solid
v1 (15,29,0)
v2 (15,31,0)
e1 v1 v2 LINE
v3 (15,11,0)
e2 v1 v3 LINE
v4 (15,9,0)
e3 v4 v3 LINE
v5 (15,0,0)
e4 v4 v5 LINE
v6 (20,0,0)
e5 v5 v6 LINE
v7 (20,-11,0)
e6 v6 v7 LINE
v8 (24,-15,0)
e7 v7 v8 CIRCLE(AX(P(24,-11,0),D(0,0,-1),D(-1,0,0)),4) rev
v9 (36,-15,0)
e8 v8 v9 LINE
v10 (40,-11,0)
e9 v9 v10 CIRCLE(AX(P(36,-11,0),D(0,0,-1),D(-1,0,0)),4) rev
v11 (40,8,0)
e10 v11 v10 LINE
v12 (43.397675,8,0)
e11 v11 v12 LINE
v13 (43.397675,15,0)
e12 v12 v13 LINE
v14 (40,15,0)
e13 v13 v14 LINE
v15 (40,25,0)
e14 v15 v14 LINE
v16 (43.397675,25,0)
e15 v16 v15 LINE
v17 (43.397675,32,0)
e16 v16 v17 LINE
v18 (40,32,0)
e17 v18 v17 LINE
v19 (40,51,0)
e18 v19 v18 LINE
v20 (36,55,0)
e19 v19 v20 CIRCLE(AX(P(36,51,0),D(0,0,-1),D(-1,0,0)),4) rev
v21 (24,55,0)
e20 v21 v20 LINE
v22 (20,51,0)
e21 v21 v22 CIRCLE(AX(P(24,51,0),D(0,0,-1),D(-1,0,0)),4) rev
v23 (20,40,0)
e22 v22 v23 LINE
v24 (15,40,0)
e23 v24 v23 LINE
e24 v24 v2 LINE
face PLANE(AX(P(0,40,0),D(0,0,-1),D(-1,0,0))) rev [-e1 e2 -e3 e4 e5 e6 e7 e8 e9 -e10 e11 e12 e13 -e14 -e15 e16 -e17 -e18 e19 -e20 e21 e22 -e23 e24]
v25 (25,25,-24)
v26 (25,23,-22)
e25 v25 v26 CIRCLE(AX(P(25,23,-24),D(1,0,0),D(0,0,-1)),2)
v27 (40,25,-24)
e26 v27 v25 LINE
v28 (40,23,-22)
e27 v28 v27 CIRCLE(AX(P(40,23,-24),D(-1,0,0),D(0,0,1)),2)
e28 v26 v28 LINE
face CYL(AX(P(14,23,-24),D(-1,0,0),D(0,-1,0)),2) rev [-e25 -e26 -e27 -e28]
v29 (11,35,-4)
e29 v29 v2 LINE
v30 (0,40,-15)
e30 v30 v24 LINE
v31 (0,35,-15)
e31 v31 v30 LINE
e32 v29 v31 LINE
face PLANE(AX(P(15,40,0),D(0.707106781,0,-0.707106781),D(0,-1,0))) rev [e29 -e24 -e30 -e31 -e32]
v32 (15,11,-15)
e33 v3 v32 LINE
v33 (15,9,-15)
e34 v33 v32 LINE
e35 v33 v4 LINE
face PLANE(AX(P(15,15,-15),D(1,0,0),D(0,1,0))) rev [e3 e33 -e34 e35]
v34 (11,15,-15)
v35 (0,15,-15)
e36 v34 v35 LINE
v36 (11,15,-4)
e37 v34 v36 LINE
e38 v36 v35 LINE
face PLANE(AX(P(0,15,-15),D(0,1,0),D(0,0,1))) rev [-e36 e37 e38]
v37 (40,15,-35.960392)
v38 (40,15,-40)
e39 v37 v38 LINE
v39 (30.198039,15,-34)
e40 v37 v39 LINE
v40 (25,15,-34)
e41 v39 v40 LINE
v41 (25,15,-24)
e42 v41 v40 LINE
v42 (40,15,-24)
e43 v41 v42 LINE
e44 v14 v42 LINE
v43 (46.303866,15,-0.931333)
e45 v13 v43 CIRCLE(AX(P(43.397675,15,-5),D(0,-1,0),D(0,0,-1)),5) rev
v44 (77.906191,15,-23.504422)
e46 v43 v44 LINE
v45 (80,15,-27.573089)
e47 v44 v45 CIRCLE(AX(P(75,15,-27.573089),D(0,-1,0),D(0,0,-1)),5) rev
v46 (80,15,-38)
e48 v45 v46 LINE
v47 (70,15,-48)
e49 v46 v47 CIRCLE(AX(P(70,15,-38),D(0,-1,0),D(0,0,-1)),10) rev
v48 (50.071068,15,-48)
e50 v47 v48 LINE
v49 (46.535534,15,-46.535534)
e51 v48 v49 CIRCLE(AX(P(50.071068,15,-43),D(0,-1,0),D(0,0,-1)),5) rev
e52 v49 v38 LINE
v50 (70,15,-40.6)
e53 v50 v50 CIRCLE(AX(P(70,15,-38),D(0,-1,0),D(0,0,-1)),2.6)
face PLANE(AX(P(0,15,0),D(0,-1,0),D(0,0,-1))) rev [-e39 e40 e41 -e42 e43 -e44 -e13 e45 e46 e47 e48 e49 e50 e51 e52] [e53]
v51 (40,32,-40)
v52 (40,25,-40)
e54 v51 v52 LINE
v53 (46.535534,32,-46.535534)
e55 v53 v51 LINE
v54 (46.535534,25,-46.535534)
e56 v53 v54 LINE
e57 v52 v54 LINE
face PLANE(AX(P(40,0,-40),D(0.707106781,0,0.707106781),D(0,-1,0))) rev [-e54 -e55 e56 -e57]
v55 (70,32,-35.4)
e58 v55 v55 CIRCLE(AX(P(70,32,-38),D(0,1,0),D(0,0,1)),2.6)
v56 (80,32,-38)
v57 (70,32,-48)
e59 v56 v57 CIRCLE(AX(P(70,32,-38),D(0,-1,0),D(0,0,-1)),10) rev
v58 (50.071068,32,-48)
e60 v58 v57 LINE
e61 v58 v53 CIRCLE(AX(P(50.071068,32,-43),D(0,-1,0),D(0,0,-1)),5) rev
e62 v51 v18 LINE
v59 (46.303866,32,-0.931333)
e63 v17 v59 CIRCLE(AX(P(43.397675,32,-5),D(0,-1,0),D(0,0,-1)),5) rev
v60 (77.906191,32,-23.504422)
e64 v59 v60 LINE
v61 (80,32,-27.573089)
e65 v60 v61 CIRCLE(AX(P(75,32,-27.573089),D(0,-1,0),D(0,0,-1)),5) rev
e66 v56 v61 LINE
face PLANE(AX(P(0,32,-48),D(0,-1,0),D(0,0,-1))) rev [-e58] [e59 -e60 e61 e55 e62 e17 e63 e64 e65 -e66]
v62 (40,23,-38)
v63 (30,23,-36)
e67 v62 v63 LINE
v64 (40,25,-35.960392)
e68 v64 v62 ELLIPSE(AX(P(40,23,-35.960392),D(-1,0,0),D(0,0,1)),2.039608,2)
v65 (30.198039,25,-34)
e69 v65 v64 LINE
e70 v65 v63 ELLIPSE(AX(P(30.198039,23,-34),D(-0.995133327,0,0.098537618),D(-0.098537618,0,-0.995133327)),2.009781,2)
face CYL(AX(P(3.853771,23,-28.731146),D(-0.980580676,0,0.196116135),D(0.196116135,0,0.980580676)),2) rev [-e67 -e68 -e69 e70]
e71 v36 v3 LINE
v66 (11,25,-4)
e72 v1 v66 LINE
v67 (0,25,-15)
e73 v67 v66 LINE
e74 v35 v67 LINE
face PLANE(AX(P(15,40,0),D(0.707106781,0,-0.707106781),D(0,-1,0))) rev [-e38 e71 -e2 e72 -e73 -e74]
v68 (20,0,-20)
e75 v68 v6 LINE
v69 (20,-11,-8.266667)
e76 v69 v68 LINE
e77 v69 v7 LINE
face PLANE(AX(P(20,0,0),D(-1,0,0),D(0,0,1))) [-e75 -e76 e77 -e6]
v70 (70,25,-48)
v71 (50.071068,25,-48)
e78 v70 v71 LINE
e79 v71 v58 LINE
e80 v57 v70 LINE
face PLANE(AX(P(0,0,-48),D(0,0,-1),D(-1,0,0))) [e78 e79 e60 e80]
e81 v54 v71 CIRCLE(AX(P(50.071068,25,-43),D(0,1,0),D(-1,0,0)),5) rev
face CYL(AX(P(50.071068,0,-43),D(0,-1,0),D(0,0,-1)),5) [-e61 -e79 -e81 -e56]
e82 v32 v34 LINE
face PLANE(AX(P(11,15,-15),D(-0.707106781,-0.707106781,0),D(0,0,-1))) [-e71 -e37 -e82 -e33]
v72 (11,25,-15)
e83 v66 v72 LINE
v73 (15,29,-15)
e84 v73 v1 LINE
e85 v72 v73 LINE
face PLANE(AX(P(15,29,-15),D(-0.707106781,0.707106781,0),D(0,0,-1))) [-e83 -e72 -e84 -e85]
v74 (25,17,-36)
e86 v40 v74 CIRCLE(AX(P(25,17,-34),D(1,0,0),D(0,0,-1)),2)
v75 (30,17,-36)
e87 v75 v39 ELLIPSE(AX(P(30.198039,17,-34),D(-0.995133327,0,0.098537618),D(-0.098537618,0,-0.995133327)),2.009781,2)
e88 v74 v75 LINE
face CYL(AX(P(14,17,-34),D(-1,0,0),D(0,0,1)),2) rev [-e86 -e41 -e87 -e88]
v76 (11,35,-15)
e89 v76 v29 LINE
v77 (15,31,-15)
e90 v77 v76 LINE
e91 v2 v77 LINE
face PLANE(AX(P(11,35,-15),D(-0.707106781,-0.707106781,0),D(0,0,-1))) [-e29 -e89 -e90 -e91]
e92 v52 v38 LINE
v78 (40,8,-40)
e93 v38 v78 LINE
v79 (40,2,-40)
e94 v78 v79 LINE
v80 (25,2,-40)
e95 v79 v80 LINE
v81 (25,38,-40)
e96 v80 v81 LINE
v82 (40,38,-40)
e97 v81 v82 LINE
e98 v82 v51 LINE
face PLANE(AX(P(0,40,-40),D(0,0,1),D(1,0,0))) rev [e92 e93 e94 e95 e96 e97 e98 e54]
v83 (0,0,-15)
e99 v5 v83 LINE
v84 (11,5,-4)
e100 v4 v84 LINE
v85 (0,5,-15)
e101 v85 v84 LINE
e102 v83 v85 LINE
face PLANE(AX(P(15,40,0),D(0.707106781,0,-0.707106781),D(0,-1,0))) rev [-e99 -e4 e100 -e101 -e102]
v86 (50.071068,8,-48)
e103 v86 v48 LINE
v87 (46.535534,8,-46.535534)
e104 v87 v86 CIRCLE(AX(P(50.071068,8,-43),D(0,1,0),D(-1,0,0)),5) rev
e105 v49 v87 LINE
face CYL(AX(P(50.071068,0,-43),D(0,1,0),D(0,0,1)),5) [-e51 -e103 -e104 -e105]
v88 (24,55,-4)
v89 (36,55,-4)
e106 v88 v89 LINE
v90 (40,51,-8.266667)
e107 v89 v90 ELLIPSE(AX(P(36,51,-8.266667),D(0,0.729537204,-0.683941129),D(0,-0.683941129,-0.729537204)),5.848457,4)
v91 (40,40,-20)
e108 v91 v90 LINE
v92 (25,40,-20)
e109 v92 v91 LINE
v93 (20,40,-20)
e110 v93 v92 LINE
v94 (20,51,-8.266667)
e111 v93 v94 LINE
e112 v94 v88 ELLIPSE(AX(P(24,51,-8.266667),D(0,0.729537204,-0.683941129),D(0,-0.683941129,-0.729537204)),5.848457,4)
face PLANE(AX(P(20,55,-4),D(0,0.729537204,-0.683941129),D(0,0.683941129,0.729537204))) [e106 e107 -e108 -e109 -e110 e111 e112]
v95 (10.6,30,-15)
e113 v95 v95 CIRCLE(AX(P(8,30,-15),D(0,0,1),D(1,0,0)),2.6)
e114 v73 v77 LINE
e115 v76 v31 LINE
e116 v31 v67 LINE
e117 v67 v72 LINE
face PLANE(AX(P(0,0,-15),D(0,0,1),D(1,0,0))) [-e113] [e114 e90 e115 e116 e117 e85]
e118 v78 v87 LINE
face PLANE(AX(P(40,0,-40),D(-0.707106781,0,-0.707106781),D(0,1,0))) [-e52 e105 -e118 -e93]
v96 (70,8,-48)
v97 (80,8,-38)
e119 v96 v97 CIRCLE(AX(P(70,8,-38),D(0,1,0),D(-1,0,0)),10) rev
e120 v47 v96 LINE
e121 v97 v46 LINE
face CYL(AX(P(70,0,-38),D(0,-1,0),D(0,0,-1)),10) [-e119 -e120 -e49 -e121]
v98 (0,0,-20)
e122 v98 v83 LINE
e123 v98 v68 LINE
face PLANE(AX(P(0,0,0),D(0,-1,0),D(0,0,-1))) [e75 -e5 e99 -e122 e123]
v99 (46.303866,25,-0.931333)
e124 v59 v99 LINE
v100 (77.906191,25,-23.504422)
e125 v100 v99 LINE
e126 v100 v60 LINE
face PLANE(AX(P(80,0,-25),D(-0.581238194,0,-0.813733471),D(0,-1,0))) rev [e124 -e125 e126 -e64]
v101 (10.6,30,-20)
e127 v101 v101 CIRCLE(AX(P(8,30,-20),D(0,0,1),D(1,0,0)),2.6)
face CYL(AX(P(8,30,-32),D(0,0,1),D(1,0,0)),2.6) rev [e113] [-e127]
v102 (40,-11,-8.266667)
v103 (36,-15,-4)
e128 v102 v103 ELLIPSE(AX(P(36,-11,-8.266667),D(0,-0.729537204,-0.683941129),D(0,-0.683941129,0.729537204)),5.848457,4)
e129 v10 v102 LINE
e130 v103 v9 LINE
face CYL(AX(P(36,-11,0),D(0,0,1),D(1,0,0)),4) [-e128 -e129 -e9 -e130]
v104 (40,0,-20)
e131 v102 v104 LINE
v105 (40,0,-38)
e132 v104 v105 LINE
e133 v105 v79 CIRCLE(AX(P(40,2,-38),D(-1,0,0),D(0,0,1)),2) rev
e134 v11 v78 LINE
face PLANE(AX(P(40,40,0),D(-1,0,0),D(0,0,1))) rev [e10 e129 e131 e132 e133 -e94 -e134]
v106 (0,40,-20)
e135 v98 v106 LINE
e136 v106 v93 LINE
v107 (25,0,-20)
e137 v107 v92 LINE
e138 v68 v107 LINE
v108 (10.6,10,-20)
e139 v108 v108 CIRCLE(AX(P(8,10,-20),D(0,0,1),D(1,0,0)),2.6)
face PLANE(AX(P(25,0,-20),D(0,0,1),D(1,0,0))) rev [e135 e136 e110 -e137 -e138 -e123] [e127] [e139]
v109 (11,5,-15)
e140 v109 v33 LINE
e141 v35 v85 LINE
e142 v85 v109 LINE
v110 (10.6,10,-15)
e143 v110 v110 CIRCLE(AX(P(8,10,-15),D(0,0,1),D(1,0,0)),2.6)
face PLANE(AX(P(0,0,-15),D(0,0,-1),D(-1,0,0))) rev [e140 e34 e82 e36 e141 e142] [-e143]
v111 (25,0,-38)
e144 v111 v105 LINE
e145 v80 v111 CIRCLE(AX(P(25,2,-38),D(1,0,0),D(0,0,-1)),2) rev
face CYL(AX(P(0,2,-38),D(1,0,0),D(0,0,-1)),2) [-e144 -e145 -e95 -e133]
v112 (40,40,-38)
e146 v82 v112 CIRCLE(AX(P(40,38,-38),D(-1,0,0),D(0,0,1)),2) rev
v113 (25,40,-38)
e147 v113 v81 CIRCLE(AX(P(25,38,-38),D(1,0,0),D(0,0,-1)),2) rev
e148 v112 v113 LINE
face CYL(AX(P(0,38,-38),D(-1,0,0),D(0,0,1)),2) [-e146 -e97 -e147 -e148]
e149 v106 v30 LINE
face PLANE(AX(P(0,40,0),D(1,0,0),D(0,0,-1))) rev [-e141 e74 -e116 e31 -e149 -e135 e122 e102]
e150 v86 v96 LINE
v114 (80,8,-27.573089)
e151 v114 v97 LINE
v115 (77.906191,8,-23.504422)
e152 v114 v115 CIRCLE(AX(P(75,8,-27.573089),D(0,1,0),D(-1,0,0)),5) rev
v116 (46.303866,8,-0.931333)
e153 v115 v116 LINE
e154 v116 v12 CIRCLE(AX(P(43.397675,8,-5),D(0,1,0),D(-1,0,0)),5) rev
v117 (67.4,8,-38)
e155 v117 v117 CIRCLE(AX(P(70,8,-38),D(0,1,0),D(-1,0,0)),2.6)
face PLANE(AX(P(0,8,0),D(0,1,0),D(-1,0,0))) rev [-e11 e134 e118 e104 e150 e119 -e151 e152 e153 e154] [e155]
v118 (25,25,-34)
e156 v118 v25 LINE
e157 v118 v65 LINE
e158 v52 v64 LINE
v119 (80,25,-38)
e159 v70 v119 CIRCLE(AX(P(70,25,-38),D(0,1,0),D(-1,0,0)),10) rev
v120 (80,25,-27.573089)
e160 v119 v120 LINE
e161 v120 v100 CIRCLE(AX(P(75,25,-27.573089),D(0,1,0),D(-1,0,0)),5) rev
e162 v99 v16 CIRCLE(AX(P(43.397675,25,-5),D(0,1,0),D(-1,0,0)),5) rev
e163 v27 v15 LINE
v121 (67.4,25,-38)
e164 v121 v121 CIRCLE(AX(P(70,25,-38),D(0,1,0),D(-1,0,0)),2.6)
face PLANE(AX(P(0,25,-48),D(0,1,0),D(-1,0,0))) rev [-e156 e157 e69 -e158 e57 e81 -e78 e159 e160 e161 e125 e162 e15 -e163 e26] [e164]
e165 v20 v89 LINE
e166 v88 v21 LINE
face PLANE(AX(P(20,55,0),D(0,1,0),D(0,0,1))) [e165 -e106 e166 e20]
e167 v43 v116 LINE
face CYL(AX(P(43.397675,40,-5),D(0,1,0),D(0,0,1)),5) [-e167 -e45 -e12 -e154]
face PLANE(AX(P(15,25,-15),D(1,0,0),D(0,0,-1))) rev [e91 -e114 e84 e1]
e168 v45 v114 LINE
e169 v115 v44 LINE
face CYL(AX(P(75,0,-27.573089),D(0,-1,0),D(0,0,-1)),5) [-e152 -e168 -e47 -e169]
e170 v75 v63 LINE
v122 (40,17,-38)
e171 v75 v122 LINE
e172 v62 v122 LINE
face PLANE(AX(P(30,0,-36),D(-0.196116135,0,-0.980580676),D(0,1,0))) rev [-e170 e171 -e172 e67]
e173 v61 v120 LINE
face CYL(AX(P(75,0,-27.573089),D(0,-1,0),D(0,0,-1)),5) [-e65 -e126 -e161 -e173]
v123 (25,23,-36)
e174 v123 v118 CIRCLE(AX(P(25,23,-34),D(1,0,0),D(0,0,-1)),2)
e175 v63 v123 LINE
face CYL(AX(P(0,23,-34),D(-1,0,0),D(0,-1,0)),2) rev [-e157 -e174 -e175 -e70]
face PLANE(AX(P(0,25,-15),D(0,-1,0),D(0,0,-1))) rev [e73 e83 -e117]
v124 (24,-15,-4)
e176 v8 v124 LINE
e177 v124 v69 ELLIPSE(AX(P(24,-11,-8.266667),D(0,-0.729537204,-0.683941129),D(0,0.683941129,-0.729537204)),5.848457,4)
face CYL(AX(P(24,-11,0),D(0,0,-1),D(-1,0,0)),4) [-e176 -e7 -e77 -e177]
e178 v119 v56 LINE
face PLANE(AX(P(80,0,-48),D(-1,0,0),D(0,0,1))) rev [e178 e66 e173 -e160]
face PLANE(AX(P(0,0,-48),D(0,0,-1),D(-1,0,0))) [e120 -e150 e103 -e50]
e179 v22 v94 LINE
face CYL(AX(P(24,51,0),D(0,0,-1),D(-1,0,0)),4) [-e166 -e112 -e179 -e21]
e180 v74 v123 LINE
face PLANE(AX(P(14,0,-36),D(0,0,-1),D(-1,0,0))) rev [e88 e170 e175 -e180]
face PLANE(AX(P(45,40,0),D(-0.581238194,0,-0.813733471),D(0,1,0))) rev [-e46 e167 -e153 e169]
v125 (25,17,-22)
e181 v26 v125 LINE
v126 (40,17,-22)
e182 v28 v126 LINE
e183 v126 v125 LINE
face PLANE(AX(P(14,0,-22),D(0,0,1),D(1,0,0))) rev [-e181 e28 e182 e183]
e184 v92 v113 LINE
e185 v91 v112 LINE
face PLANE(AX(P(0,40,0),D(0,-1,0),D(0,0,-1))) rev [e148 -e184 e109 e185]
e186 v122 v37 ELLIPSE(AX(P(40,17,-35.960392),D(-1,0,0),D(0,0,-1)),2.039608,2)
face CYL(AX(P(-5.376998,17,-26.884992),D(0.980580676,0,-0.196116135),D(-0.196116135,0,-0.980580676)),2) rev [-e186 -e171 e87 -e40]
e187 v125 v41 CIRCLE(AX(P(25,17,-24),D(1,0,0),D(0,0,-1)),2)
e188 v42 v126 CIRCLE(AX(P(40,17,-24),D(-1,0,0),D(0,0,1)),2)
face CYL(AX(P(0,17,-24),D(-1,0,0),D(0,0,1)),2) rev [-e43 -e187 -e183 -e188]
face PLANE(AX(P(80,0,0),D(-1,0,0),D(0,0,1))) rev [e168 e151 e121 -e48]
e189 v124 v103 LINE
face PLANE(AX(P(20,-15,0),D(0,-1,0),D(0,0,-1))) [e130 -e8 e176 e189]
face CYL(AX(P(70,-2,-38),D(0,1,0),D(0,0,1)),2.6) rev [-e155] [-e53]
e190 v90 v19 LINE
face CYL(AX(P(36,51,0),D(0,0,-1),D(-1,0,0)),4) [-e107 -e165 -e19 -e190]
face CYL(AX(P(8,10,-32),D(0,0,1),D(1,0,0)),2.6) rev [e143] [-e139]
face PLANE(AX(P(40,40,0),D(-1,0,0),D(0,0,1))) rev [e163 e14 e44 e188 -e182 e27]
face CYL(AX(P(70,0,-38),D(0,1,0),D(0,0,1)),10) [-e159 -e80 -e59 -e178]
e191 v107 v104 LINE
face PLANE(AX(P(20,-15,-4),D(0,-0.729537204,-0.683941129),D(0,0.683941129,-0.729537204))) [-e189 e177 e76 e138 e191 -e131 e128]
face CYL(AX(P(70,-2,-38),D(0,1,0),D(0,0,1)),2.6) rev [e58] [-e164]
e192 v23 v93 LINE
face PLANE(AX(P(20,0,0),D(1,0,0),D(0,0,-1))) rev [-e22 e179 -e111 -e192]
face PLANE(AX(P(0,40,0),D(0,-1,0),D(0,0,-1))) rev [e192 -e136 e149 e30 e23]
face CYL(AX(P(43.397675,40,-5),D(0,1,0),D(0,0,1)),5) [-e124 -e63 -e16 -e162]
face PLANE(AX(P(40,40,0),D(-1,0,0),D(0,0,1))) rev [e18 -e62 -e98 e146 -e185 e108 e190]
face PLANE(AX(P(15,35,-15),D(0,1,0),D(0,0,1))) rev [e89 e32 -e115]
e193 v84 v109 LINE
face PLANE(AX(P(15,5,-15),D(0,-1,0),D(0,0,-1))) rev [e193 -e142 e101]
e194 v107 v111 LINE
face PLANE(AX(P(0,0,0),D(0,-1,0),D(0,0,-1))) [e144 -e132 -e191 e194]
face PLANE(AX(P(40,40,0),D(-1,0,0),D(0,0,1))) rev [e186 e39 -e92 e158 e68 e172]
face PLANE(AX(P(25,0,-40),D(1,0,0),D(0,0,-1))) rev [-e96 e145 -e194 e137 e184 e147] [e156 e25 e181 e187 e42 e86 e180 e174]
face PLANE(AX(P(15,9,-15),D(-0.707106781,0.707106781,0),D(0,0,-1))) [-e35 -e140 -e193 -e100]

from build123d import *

# Parameters (mm, degrees)
SKETCH1_W                = 40
SKETCH1_H                = 40
BOSS_EXTRUDE1_DEPTH      = 40
SKETCH2_W                = 25
SKETCH2_H                = 20
CUT_EXTRUDE1_DEPTH       = 40
CHAMFER1_SIZE            = 15
CUT_EXTRUDE2_DEPTH       = 15
CHAMFER2_SIZE            = 4
SKETCH4_R                = 2.6
CUT_EXTRUDE3_DEPTH       = 17
BOSS_EXTRUDE2_DEPTH      = 8
BOSS_EXTRUDE2_DEPTH_BACK = 40
SKETCH5_W                = 40
SKETCH5_H                = 7
CHAMFER3_SIZE            = 35
CHAMFER3_SIZE2           = 25
CHAMFER4_SIZE            = 25
CHAMFER4_SIZE2           = 35
CHAMFER5_SIZE            = 8
FILLET1_R                = 10
FILLET2_R                = 5
SKETCH8_R                = 2.6
CUT_EXTRUDE4_DEPTH       = 34
BOSS_EXTRUDE3_DEPTH      = 20
FILLET3_R                = 4
FILLET4_R                = 2
CUT_EXTRUDE5_DEPTH       = 26
CHAMFER6_SIZE            = 2
CHAMFER6_SIZE2           = 10
FILLET5_R                = 2


with BuildPart() as part:
    # Sketch1 → Boss-Extrude1 (new body)
    with BuildSketch(Plane(origin=(0, 0, 0), x_dir=(1, 0, 0), z_dir=(0, 1, 0))):
        with Locations((20, 20)):
            Rectangle(SKETCH1_W, SKETCH1_H)
    extrude(amount=BOSS_EXTRUDE1_DEPTH)

    # Sketch2 → Cut-Extrude1 (cut)
    with BuildSketch(Plane(origin=(0, 40, 0), x_dir=(1, 0, 0), z_dir=(0, 1, 0))):
        with Locations((12.5, 30)):
            Rectangle(SKETCH2_W, SKETCH2_H)
    extrude(amount=-CUT_EXTRUDE1_DEPTH, mode=Mode.SUBTRACT)

    # Chamfer1
    chamfer1_edges = [part.edges().sort_by_distance(p)[0] for p in [
        (0, 20, 0),
    ]]
    chamfer(chamfer1_edges, length=CHAMFER1_SIZE)

    # Sketch3 → Cut-Extrude2 (cut)
    with BuildSketch(Plane.XY):
        Polygon((0, 10), (0, 15), (15, 15), (15, 5), (0, 5), align=None)
        Polygon((0, 30), (0, 25), (15, 25), (15, 35), (0, 35), align=None)
    extrude(amount=-CUT_EXTRUDE2_DEPTH, mode=Mode.SUBTRACT)

    # Chamfer2
    chamfer2_edges = [part.edges().sort_by_distance(p)[0] for p in [
        (15, 35, -7.5),
        (15, 25, -7.5),
        (15, 15, -7.5),
        (15, 5, -7.5),
    ]]
    chamfer(chamfer2_edges, length=CHAMFER2_SIZE)

    # Sketch4 → Cut-Extrude3 (cut)
    with BuildSketch(Plane.XY.offset(-15)):
        with Locations((8, 30)):
            Circle(SKETCH4_R)
        with Locations((8, 10)):
            Circle(SKETCH4_R)
    extrude(amount=-CUT_EXTRUDE3_DEPTH, mode=Mode.SUBTRACT)

    # Sketch5 → Boss-Extrude2 (add, two sides: drawn at the far end of the back side and taken through both)
    with BuildSketch(Plane(origin=(0, 0, -40), x_dir=(-1, 0, 0), z_dir=(0, 0, -1)).offset(-BOSS_EXTRUDE2_DEPTH_BACK)):
        with Locations((-60, 11.5)):
            Rectangle(SKETCH5_W, SKETCH5_H)
        with Locations((-60, 28.5)):
            Rectangle(SKETCH5_W, SKETCH5_H)
    extrude(amount=BOSS_EXTRUDE2_DEPTH + BOSS_EXTRUDE2_DEPTH_BACK)

    # Chamfer3
    chamfer3_edges = [part.edges().sort_by_distance(p)[0] for p in [
        (80, 28.5, 0),
    ]]
    chamfer3_side = [part.faces().sort_by_distance(p)[0] for p in [
        (39.166666667, 20, 0),
    ]]
    chamfer(chamfer3_edges, length=CHAMFER3_SIZE, length2=CHAMFER3_SIZE2, reference=chamfer3_side[0])

    # Chamfer4
    chamfer4_edges = [part.edges().sort_by_distance(p)[0] for p in [
        (80, 11.5, 0),
    ]]
    chamfer4_side = [part.faces().sort_by_distance(p)[0] for p in [
        (80, 11.5, -24),
    ]]
    chamfer(chamfer4_edges, length=CHAMFER4_SIZE, length2=CHAMFER4_SIZE2, reference=chamfer4_side[0])

    # Chamfer5
    chamfer5_edges = [part.edges().sort_by_distance(p)[0] for p in [
        (40, 28.5, -48),
        (40, 11.5, -48),
    ]]
    chamfer(chamfer5_edges, length=CHAMFER5_SIZE - 0.0001)  # a hair under: the kernel refuses the full size

    # Fillet1
    fillet1_edges = [part.edges().sort_by_distance(p)[0] for p in [
        (80, 11.5, -48),
        (80, 28.5, -48),
    ]]
    fillet(fillet1_edges, radius=FILLET1_R)

    # Fillet2
    fillet2_edges = [part.edges().sort_by_distance(p)[0] for p in [
        (80, 28.5, -25),
        (45, 28.5, 0),
        (45, 11.5, 0),
        (80, 11.5, -25),
        (47.9999, 28.5, -48),
        (47.9999, 11.5, -48),
    ]]
    fillet(fillet2_edges, radius=FILLET2_R)

    # Sketch8 → Cut-Extrude4 (cut)
    with BuildSketch(Plane(origin=(0, 32, 0), x_dir=(1, 0, 0), z_dir=(0, 1, 0))):
        with Locations(Location((70, 38, 0), (0, 0, 270))):
            Circle(SKETCH8_R)
    extrude(amount=-CUT_EXTRUDE4_DEPTH, mode=Mode.SUBTRACT)

    # Sketch9 → Boss-Extrude3 (add)
    with BuildSketch(Plane(origin=(40, 0, 0), x_dir=(0, 0, -1), z_dir=(1, 0, 0))):
        Polygon((0, 40), (0, 55), (4, 55), (20, 40), align=None)
        Polygon((0, 0), (0, -15), (4, -15), (20, 0), align=None)
    extrude(amount=-BOSS_EXTRUDE3_DEPTH)

    # Fillet3
    fillet3_edges = [part.edges().sort_by_distance(p)[0] for p in [
        (20, 55, -2),
        (40, 55, -2),
        (20, -15, -2),
        (40, -15, -2),
    ]]
    fillet(fillet3_edges, radius=FILLET3_R)

    # Fillet4
    fillet4_edges = [part.edges().sort_by_distance(p)[0] for p in [
        (32.5, 40, -40),
        (32.5, 0, -40),
    ]]
    fillet(fillet4_edges, radius=FILLET4_R)

    # Sketch10 → Cut-Extrude5 (cut)
    with BuildSketch(Plane(origin=(40, 0, 0), x_dir=(0, 0, -1), z_dir=(1, 0, 0))):
        Polygon((22, 15), (36, 15), (36, 20), (36, 25), (22, 25), align=None)
    extrude(amount=-CUT_EXTRUDE5_DEPTH, mode=Mode.SUBTRACT)

    # Chamfer6
    chamfer6_edges = [part.edges().sort_by_distance(p)[0] for p in [
        (40, 20, -36),
    ]]
    chamfer6_side = [part.faces().sort_by_distance(p)[0] for p in [
        (40, 20, -38),
    ]]
    chamfer(chamfer6_edges, length=CHAMFER6_SIZE, length2=CHAMFER6_SIZE2, reference=chamfer6_side[0])

    # Fillet5
    fillet5_edges = [part.edges().sort_by_distance(p)[0] for p in [
        (32.5, 25, -22),
        (27.5, 25, -36),
        (27.5, 15, -36),
        (32.5, 15, -22),
        (35, 25, -37),
        (35, 15, -37),
    ]]
    fillet(fillet5_edges, radius=FILLET5_R)


solid = part.part
